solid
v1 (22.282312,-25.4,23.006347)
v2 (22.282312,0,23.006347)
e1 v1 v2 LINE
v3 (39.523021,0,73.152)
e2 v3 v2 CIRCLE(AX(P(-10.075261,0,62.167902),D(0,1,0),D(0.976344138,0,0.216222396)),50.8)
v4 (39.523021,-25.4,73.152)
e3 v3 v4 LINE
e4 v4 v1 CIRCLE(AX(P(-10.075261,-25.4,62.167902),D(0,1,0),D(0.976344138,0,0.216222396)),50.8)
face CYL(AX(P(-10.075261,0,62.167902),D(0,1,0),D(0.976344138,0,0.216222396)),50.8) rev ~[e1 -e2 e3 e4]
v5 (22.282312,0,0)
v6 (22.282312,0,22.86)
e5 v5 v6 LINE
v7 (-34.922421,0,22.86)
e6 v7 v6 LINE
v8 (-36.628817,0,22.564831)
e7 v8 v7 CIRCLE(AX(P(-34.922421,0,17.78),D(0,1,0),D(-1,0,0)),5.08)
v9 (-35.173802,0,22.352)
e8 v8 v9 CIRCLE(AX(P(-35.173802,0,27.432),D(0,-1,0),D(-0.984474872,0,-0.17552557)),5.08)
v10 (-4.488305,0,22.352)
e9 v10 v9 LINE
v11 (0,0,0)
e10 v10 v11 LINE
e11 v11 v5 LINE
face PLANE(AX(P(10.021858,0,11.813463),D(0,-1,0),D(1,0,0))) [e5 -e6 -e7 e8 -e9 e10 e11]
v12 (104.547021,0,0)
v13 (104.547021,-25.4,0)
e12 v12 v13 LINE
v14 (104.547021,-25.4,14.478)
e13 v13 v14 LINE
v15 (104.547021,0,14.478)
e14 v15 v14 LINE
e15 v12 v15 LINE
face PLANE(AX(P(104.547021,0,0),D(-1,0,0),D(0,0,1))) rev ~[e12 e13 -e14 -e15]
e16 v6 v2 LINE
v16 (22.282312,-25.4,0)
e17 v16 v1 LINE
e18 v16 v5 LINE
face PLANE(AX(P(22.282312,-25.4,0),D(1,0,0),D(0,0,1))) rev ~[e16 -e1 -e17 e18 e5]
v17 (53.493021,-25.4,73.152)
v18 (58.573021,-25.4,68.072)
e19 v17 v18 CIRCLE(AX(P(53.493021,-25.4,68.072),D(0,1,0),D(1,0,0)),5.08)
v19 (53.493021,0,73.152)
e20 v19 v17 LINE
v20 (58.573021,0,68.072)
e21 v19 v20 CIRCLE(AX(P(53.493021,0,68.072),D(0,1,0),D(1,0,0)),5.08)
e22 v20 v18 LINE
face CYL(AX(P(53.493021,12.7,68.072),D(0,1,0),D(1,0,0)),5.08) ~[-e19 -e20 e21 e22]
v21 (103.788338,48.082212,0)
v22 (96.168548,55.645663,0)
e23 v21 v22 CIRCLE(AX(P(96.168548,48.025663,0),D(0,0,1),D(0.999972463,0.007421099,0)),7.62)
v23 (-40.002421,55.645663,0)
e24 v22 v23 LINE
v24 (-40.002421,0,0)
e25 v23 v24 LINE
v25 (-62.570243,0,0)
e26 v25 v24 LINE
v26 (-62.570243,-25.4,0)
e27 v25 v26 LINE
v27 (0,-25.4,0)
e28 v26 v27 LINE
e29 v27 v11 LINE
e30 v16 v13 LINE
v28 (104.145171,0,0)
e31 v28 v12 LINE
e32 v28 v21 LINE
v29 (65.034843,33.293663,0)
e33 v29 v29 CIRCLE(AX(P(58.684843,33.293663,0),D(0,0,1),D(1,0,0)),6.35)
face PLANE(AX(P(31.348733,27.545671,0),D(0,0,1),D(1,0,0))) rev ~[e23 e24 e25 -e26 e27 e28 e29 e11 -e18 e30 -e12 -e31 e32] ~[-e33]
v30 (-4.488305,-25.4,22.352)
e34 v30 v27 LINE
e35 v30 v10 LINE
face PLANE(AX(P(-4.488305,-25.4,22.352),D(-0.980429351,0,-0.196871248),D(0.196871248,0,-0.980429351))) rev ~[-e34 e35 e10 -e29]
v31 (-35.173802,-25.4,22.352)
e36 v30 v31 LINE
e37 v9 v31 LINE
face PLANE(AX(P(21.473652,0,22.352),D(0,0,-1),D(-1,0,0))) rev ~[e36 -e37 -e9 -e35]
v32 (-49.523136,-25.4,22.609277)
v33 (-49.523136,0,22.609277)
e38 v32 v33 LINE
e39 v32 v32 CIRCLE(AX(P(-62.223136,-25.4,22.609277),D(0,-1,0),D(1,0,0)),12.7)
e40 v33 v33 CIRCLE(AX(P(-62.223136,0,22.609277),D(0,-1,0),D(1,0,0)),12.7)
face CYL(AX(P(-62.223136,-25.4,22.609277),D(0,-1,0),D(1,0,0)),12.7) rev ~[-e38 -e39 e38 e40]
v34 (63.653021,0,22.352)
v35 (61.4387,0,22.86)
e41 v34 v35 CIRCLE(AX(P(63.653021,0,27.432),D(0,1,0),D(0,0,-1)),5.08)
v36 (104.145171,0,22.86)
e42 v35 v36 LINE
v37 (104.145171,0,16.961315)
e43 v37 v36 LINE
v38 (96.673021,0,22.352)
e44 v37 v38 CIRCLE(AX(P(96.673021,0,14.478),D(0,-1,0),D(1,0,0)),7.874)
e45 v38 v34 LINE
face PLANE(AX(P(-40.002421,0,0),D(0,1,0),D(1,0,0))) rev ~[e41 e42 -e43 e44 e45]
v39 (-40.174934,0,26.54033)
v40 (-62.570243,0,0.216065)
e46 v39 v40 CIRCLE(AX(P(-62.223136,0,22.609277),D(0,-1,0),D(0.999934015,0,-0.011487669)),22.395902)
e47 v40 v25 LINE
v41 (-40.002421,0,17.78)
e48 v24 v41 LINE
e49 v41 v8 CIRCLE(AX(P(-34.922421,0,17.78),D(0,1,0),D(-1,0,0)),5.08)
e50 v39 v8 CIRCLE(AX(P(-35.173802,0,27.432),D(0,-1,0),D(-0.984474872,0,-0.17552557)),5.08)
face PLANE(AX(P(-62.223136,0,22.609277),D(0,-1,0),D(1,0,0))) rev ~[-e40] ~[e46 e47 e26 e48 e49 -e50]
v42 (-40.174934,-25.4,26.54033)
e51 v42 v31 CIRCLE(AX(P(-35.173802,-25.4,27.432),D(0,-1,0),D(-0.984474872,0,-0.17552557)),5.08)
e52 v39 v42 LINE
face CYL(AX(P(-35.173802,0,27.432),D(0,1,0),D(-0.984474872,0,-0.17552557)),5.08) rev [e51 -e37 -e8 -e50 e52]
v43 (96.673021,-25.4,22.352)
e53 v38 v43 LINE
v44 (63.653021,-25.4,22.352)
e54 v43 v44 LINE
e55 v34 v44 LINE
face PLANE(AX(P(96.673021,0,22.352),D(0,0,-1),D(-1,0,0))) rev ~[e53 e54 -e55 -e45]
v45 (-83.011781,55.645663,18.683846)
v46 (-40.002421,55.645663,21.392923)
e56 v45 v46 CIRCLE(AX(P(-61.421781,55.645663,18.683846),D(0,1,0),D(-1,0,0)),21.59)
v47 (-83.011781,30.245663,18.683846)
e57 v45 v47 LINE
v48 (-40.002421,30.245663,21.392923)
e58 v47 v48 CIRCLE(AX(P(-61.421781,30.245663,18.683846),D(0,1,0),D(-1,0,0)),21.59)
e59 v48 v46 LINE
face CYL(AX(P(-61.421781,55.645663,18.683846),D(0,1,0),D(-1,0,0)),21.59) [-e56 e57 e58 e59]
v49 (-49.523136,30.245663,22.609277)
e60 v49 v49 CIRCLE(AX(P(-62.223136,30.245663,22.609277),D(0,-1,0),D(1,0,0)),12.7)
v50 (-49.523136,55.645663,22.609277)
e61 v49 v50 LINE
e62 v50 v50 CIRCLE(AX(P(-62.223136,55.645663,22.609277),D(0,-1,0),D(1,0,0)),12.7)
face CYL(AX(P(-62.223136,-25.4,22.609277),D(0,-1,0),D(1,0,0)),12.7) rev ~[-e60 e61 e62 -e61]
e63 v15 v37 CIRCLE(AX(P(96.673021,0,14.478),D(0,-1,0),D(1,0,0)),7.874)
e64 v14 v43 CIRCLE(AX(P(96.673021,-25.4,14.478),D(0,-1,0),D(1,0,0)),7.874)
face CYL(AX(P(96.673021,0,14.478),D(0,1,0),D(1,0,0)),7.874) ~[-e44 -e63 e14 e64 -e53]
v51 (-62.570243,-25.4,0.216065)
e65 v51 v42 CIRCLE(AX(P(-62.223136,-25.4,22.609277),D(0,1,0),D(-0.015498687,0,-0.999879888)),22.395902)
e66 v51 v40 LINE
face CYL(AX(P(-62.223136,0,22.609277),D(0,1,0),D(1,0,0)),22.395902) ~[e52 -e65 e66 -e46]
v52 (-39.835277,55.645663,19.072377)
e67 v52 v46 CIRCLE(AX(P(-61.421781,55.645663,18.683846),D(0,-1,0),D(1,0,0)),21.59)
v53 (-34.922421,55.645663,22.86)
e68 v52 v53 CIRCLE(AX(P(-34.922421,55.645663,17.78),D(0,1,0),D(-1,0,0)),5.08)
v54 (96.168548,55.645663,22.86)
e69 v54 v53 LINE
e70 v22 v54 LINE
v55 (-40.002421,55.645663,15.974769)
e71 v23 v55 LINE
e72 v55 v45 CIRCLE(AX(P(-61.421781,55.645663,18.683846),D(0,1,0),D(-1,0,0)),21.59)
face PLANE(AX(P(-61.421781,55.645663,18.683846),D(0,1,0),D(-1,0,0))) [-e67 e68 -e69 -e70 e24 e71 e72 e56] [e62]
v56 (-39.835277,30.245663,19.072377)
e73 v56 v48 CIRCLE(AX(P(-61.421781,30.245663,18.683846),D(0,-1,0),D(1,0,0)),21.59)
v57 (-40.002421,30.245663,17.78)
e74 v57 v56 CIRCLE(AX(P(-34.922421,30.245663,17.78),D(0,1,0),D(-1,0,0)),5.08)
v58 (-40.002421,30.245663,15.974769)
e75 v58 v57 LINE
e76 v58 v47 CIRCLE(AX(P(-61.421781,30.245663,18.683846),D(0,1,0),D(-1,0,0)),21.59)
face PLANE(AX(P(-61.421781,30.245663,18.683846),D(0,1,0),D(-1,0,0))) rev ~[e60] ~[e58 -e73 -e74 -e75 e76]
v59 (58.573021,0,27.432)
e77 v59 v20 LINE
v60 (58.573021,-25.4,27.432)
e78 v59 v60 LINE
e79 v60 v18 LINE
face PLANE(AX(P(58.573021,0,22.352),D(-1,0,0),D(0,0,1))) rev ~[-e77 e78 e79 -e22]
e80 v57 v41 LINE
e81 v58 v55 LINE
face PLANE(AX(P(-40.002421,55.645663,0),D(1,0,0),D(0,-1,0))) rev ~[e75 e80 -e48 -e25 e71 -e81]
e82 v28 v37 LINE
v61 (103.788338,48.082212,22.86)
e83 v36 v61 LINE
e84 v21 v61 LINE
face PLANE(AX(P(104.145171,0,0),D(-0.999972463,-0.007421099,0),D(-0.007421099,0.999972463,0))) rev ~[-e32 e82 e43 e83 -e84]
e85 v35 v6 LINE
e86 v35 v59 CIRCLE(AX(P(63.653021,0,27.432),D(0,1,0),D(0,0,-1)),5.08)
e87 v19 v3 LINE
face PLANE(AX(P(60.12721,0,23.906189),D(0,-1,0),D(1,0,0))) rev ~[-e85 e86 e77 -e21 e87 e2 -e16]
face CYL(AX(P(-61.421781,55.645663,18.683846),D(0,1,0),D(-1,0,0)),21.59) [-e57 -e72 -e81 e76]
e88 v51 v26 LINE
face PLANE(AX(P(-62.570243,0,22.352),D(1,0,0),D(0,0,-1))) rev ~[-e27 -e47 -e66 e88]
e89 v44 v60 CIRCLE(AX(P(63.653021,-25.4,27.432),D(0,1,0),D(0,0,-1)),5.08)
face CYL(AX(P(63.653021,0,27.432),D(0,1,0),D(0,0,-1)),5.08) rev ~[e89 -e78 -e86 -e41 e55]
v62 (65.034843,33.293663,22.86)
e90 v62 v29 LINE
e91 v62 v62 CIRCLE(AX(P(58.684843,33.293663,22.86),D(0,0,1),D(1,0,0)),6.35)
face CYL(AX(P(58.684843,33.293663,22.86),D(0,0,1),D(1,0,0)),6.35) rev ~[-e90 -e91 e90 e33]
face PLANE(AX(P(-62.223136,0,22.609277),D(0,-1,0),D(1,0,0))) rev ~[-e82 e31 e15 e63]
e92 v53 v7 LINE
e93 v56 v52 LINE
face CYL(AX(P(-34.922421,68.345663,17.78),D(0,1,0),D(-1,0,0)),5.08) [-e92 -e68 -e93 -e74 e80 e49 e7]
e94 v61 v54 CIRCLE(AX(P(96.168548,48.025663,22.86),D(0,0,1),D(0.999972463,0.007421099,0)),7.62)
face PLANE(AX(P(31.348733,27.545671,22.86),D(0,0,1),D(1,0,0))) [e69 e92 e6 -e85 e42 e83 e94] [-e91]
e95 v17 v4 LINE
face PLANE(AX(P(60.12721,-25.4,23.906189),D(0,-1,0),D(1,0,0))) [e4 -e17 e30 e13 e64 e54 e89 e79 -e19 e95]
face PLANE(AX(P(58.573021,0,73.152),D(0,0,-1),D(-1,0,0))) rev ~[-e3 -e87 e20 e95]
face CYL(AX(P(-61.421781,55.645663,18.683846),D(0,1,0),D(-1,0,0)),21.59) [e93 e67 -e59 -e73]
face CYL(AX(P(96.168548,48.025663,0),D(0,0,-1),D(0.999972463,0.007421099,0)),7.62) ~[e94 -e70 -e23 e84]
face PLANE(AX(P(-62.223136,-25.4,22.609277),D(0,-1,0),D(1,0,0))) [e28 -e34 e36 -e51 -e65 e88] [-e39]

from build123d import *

# Parameters (mm, degrees)
F1_DEPTH      = 25.4
F2_R          = 22.395901736
F3_DEPTH      = 25.4
F5_DEPTH      = 22.86
F6_R          = 6.35
F7_DEPTH      = 22.861
F9_DEPTH      = 25.4
F10_T1_DEPTH  = 25.4
F10_T3_DEPTH  = 50.8
F11_R         = 21.59
F12_DEPTH     = 25.4
F13_T4_DEPTH  = 68.3456632912
F13_S5_R      = 21.59
F13_T6_DEPTH  = 36
F13_T11_DEPTH = 68.3456632912
F13_S12_R     = 21.59
F13_T13_DEPTH = 36
F13_T18_DEPTH = 68.3456632912
F13_S19_R     = 21.59
F13_T20_DEPTH = 36
F14_R         = 12.7
F15_DEPTH     = 81.0466632912


# Not quite as in the source:
# - a fillet or chamfer that OpenCascade refuses, or shapes differently, is made with other operations: its cross-section is extruded or revolved along the edge and cut away or added


with BuildPart() as f1:
    # F0 (on Front) → F1 (new body)
    with BuildSketch(Plane.XZ):
        with BuildLine():
            Line((-62.5702434896, 0), (104.5470208636, 0))
            Line((104.5470208636, 0), (104.5470208636, 14.478))
            ThreePointArc((104.5470208636, 14.478), (102.2407796587, 20.0457587951), (96.6730208636, 22.352))
            Line((96.6730208636, 22.352), (58.5730208636, 22.352))
            Line((58.5730208636, 22.352), (58.5730208636, 73.152))
            Line((58.5730208636, 73.152), (39.5230208636, 73.152))
            ThreePointArc((39.5230208636, 73.152), (37.7930667188, 45.1601637849), (21.4736518763, 22.352))
            Line((21.4736518763, 22.352), (-62.5702434896, 22.352))
            Line((-62.5702434896, 22.352), (-62.5702434896, 0))
        make_face()
    extrude(amount=F1_DEPTH)

    # F2 (on Front) → F3 (join)
    with BuildSketch(Plane.XZ):
        with Locations((-62.223136425, 22.609276697)):
            Circle(F2_R)
    extrude(amount=F3_DEPTH)

    # F4 (on Top) → F5 (join)
    with BuildSketch(Plane.XY):
        with BuildLine():
            Line((-40.0024205446, 55.6456632912), (-40.0024205446, 0))
            Line((-40.0024205446, 0), (104.1451707114, 0))
            Line((104.1451707114, 0), (103.7883380443, 48.0822120633))
            ThreePointArc((103.7883380443, 48.0822120633), (101.536671306, 53.4337730184), (96.1685478742, 55.6456632912))
            Line((96.1685478742, 55.6456632912), (-40.0024205446, 55.6456632912))
        make_face()
    extrude(amount=F5_DEPTH)

    # F6 (on face) → F7 (cut, through all)
    with BuildSketch(Plane.XY.offset(22.86)):
        with Locations((58.6848433214, 33.2936632912)):
            Circle(F6_R)
    extrude(amount=-F7_DEPTH, mode=Mode.SUBTRACT)

    # F8 (on face) → F9 (cut)
    with BuildSketch(Plane.XZ.offset(25.4)):
        with BuildLine():
            Line((22.2823120117, 0), (22.2823120117, 23.0063465614))
            ThreePointArc((22.2823120117, 23.0063465614), (21.8796568843, 22.6771033417), (21.4736518763, 22.352))
            Line((21.4736518763, 22.352), (-4.4883051887, 22.352))
            Line((-4.4883051887, 22.352), (0, 0))
            Line((0, 0), (22.2823120117, 0))
        make_face()
    extrude(amount=-F9_DEPTH, mode=Mode.SUBTRACT)

    # F10: fillet of radius 5.08 on 3 edges, made by hand

    # F10_s2 → F10_t1 (join)
    with BuildSketch(Plane.XZ):
        with BuildLine():
            ThreePointArc((63.6530208636, 22.352), (60.0609184152, 23.8398975516), (58.5730208636, 27.432))
            Line((58.5730208636, 27.432), (58.5730208636, 22.352))
            Line((58.5730208636, 22.352), (63.6530208636, 22.352))
        make_face()
        with BuildLine():
            ThreePointArc((-40.1749339209, 26.5403301063), (-38.4354512238, 23.537383006), (-35.1738015691, 22.352))
            Line((-35.1738015691, 22.352), (-39.8287124925, 22.352))
            ThreePointArc((-39.8287124925, 22.352), (-39.9033629402, 24.4543041094), (-40.1749339209, 26.5403301063))
        make_face()
    extrude(amount=F10_T1_DEPTH)

    # F10_s4 → F10_t3 (cut)
    with BuildSketch(Plane.XZ.offset(-12.7)):
        with BuildLine():
            ThreePointArc((58.5730208636, 68.072), (57.085123312, 71.6641024484), (53.4930208636, 73.152))
            Line((53.4930208636, 73.152), (58.5730208636, 73.152))
            Line((58.5730208636, 73.152), (58.5730208636, 68.072))
        make_face()
    extrude(amount=F10_T3_DEPTH, mode=Mode.SUBTRACT)

    # F11 (on face) → F12 (join)
    with BuildSketch(Plane(origin=(0, 55.6456632912, 0), x_dir=(-1, 0, 0), z_dir=(0, 1, 0))):
        with Locations((61.4217809885, 18.6838455159)):
            Circle(F11_R)
    extrude(amount=-F12_DEPTH)

    # F13: fillet of radius 5.08 on 1 edges, made by hand


with BuildPart() as f13_tool2:
    # F13_s3 → F13_t4 (new body)
    with BuildSketch(Plane.XZ.offset(-68.3456632912)):
        with BuildLine():
            ThreePointArc((-40.0024205446, 17.78), (-38.5145229931, 21.3721024484), (-34.9224205446, 22.86))
            Line((-34.9224205446, 22.86), (-40.0024205446, 22.86))
            Line((-40.0024205446, 22.86), (-40.0024205446, 17.78))
        make_face()
    extrude(amount=F13_T4_DEPTH)

    # F13_s5 → F13_t6 (cut, symmetric)
    with BuildSketch(Plane.XZ.offset(-34.2)):
        with Locations((-61.4217809885, 18.6838455159)):
            Circle(F13_S5_R)
    extrude(amount=F13_T6_DEPTH, both=True, mode=Mode.SUBTRACT)

    split(bisect_by=Plane.XZ.offset(-30.2456632912), keep=Keep.BOTTOM)


with BuildPart() as f1_1:
    add(f1.part)

    # F13_t1: cut F13_tool2
    add(f13_tool2.part, mode=Mode.SUBTRACT)


with BuildPart() as f13_tool9:
    # F13_s10 → F13_t11 (new body)
    with BuildSketch(Plane.XZ.offset(-68.3456632912)):
        with BuildLine():
            ThreePointArc((-40.0024205446, 17.78), (-38.5145229931, 21.3721024484), (-34.9224205446, 22.86))
            Line((-34.9224205446, 22.86), (-40.0024205446, 22.86))
            Line((-40.0024205446, 22.86), (-40.0024205446, 17.78))
        make_face()
    extrude(amount=F13_T11_DEPTH)

    # F13_s12 → F13_t13 (intersect, symmetric)
    with BuildSketch(Plane.XZ.offset(-34.2)):
        with Locations((-61.4217809885, 18.6838455159)):
            Circle(F13_S12_R)
    extrude(amount=F13_T13_DEPTH, both=True, mode=Mode.INTERSECT)

    split(bisect_by=Plane.XZ.offset(-30.2456632912), keep=Keep.TOP)


with BuildPart() as f1_2:
    add(f1_1.part)

    # F13_t8: cut F13_tool9
    add(f13_tool9.part, mode=Mode.SUBTRACT)


with BuildPart() as f13_tool16:
    # F13_s17 → F13_t18 (new body)
    with BuildSketch(Plane.XZ.offset(-68.3456632912)):
        with BuildLine():
            ThreePointArc((-40.0024205446, 17.78), (-38.5145229931, 21.3721024484), (-34.9224205446, 22.86))
            Line((-34.9224205446, 22.86), (-40.0024205446, 22.86))
            Line((-40.0024205446, 22.86), (-40.0024205446, 17.78))
        make_face()
    extrude(amount=F13_T18_DEPTH)

    # F13_s19 → F13_t20 (cut, symmetric)
    with BuildSketch(Plane.XZ.offset(-34.2)):
        with Locations((-61.4217809885, 18.6838455159)):
            Circle(F13_S19_R)
    extrude(amount=F13_T20_DEPTH, both=True, mode=Mode.SUBTRACT)

    split(bisect_by=Plane.XZ.offset(-30.2456632912), keep=Keep.TOP)


with BuildPart() as f1_3:
    add(f1_2.part)

    # F13_t15: cut F13_tool16
    add(f13_tool16.part, mode=Mode.SUBTRACT)

    # F14 (on face) → F15 (cut, through all)
    with BuildSketch(Plane.XZ.offset(25.4)):
        with Locations((-62.223136425, 22.609276697)):
            Circle(F14_R)
    extrude(amount=-F15_DEPTH, mode=Mode.SUBTRACT)


solid = f1_3.part
